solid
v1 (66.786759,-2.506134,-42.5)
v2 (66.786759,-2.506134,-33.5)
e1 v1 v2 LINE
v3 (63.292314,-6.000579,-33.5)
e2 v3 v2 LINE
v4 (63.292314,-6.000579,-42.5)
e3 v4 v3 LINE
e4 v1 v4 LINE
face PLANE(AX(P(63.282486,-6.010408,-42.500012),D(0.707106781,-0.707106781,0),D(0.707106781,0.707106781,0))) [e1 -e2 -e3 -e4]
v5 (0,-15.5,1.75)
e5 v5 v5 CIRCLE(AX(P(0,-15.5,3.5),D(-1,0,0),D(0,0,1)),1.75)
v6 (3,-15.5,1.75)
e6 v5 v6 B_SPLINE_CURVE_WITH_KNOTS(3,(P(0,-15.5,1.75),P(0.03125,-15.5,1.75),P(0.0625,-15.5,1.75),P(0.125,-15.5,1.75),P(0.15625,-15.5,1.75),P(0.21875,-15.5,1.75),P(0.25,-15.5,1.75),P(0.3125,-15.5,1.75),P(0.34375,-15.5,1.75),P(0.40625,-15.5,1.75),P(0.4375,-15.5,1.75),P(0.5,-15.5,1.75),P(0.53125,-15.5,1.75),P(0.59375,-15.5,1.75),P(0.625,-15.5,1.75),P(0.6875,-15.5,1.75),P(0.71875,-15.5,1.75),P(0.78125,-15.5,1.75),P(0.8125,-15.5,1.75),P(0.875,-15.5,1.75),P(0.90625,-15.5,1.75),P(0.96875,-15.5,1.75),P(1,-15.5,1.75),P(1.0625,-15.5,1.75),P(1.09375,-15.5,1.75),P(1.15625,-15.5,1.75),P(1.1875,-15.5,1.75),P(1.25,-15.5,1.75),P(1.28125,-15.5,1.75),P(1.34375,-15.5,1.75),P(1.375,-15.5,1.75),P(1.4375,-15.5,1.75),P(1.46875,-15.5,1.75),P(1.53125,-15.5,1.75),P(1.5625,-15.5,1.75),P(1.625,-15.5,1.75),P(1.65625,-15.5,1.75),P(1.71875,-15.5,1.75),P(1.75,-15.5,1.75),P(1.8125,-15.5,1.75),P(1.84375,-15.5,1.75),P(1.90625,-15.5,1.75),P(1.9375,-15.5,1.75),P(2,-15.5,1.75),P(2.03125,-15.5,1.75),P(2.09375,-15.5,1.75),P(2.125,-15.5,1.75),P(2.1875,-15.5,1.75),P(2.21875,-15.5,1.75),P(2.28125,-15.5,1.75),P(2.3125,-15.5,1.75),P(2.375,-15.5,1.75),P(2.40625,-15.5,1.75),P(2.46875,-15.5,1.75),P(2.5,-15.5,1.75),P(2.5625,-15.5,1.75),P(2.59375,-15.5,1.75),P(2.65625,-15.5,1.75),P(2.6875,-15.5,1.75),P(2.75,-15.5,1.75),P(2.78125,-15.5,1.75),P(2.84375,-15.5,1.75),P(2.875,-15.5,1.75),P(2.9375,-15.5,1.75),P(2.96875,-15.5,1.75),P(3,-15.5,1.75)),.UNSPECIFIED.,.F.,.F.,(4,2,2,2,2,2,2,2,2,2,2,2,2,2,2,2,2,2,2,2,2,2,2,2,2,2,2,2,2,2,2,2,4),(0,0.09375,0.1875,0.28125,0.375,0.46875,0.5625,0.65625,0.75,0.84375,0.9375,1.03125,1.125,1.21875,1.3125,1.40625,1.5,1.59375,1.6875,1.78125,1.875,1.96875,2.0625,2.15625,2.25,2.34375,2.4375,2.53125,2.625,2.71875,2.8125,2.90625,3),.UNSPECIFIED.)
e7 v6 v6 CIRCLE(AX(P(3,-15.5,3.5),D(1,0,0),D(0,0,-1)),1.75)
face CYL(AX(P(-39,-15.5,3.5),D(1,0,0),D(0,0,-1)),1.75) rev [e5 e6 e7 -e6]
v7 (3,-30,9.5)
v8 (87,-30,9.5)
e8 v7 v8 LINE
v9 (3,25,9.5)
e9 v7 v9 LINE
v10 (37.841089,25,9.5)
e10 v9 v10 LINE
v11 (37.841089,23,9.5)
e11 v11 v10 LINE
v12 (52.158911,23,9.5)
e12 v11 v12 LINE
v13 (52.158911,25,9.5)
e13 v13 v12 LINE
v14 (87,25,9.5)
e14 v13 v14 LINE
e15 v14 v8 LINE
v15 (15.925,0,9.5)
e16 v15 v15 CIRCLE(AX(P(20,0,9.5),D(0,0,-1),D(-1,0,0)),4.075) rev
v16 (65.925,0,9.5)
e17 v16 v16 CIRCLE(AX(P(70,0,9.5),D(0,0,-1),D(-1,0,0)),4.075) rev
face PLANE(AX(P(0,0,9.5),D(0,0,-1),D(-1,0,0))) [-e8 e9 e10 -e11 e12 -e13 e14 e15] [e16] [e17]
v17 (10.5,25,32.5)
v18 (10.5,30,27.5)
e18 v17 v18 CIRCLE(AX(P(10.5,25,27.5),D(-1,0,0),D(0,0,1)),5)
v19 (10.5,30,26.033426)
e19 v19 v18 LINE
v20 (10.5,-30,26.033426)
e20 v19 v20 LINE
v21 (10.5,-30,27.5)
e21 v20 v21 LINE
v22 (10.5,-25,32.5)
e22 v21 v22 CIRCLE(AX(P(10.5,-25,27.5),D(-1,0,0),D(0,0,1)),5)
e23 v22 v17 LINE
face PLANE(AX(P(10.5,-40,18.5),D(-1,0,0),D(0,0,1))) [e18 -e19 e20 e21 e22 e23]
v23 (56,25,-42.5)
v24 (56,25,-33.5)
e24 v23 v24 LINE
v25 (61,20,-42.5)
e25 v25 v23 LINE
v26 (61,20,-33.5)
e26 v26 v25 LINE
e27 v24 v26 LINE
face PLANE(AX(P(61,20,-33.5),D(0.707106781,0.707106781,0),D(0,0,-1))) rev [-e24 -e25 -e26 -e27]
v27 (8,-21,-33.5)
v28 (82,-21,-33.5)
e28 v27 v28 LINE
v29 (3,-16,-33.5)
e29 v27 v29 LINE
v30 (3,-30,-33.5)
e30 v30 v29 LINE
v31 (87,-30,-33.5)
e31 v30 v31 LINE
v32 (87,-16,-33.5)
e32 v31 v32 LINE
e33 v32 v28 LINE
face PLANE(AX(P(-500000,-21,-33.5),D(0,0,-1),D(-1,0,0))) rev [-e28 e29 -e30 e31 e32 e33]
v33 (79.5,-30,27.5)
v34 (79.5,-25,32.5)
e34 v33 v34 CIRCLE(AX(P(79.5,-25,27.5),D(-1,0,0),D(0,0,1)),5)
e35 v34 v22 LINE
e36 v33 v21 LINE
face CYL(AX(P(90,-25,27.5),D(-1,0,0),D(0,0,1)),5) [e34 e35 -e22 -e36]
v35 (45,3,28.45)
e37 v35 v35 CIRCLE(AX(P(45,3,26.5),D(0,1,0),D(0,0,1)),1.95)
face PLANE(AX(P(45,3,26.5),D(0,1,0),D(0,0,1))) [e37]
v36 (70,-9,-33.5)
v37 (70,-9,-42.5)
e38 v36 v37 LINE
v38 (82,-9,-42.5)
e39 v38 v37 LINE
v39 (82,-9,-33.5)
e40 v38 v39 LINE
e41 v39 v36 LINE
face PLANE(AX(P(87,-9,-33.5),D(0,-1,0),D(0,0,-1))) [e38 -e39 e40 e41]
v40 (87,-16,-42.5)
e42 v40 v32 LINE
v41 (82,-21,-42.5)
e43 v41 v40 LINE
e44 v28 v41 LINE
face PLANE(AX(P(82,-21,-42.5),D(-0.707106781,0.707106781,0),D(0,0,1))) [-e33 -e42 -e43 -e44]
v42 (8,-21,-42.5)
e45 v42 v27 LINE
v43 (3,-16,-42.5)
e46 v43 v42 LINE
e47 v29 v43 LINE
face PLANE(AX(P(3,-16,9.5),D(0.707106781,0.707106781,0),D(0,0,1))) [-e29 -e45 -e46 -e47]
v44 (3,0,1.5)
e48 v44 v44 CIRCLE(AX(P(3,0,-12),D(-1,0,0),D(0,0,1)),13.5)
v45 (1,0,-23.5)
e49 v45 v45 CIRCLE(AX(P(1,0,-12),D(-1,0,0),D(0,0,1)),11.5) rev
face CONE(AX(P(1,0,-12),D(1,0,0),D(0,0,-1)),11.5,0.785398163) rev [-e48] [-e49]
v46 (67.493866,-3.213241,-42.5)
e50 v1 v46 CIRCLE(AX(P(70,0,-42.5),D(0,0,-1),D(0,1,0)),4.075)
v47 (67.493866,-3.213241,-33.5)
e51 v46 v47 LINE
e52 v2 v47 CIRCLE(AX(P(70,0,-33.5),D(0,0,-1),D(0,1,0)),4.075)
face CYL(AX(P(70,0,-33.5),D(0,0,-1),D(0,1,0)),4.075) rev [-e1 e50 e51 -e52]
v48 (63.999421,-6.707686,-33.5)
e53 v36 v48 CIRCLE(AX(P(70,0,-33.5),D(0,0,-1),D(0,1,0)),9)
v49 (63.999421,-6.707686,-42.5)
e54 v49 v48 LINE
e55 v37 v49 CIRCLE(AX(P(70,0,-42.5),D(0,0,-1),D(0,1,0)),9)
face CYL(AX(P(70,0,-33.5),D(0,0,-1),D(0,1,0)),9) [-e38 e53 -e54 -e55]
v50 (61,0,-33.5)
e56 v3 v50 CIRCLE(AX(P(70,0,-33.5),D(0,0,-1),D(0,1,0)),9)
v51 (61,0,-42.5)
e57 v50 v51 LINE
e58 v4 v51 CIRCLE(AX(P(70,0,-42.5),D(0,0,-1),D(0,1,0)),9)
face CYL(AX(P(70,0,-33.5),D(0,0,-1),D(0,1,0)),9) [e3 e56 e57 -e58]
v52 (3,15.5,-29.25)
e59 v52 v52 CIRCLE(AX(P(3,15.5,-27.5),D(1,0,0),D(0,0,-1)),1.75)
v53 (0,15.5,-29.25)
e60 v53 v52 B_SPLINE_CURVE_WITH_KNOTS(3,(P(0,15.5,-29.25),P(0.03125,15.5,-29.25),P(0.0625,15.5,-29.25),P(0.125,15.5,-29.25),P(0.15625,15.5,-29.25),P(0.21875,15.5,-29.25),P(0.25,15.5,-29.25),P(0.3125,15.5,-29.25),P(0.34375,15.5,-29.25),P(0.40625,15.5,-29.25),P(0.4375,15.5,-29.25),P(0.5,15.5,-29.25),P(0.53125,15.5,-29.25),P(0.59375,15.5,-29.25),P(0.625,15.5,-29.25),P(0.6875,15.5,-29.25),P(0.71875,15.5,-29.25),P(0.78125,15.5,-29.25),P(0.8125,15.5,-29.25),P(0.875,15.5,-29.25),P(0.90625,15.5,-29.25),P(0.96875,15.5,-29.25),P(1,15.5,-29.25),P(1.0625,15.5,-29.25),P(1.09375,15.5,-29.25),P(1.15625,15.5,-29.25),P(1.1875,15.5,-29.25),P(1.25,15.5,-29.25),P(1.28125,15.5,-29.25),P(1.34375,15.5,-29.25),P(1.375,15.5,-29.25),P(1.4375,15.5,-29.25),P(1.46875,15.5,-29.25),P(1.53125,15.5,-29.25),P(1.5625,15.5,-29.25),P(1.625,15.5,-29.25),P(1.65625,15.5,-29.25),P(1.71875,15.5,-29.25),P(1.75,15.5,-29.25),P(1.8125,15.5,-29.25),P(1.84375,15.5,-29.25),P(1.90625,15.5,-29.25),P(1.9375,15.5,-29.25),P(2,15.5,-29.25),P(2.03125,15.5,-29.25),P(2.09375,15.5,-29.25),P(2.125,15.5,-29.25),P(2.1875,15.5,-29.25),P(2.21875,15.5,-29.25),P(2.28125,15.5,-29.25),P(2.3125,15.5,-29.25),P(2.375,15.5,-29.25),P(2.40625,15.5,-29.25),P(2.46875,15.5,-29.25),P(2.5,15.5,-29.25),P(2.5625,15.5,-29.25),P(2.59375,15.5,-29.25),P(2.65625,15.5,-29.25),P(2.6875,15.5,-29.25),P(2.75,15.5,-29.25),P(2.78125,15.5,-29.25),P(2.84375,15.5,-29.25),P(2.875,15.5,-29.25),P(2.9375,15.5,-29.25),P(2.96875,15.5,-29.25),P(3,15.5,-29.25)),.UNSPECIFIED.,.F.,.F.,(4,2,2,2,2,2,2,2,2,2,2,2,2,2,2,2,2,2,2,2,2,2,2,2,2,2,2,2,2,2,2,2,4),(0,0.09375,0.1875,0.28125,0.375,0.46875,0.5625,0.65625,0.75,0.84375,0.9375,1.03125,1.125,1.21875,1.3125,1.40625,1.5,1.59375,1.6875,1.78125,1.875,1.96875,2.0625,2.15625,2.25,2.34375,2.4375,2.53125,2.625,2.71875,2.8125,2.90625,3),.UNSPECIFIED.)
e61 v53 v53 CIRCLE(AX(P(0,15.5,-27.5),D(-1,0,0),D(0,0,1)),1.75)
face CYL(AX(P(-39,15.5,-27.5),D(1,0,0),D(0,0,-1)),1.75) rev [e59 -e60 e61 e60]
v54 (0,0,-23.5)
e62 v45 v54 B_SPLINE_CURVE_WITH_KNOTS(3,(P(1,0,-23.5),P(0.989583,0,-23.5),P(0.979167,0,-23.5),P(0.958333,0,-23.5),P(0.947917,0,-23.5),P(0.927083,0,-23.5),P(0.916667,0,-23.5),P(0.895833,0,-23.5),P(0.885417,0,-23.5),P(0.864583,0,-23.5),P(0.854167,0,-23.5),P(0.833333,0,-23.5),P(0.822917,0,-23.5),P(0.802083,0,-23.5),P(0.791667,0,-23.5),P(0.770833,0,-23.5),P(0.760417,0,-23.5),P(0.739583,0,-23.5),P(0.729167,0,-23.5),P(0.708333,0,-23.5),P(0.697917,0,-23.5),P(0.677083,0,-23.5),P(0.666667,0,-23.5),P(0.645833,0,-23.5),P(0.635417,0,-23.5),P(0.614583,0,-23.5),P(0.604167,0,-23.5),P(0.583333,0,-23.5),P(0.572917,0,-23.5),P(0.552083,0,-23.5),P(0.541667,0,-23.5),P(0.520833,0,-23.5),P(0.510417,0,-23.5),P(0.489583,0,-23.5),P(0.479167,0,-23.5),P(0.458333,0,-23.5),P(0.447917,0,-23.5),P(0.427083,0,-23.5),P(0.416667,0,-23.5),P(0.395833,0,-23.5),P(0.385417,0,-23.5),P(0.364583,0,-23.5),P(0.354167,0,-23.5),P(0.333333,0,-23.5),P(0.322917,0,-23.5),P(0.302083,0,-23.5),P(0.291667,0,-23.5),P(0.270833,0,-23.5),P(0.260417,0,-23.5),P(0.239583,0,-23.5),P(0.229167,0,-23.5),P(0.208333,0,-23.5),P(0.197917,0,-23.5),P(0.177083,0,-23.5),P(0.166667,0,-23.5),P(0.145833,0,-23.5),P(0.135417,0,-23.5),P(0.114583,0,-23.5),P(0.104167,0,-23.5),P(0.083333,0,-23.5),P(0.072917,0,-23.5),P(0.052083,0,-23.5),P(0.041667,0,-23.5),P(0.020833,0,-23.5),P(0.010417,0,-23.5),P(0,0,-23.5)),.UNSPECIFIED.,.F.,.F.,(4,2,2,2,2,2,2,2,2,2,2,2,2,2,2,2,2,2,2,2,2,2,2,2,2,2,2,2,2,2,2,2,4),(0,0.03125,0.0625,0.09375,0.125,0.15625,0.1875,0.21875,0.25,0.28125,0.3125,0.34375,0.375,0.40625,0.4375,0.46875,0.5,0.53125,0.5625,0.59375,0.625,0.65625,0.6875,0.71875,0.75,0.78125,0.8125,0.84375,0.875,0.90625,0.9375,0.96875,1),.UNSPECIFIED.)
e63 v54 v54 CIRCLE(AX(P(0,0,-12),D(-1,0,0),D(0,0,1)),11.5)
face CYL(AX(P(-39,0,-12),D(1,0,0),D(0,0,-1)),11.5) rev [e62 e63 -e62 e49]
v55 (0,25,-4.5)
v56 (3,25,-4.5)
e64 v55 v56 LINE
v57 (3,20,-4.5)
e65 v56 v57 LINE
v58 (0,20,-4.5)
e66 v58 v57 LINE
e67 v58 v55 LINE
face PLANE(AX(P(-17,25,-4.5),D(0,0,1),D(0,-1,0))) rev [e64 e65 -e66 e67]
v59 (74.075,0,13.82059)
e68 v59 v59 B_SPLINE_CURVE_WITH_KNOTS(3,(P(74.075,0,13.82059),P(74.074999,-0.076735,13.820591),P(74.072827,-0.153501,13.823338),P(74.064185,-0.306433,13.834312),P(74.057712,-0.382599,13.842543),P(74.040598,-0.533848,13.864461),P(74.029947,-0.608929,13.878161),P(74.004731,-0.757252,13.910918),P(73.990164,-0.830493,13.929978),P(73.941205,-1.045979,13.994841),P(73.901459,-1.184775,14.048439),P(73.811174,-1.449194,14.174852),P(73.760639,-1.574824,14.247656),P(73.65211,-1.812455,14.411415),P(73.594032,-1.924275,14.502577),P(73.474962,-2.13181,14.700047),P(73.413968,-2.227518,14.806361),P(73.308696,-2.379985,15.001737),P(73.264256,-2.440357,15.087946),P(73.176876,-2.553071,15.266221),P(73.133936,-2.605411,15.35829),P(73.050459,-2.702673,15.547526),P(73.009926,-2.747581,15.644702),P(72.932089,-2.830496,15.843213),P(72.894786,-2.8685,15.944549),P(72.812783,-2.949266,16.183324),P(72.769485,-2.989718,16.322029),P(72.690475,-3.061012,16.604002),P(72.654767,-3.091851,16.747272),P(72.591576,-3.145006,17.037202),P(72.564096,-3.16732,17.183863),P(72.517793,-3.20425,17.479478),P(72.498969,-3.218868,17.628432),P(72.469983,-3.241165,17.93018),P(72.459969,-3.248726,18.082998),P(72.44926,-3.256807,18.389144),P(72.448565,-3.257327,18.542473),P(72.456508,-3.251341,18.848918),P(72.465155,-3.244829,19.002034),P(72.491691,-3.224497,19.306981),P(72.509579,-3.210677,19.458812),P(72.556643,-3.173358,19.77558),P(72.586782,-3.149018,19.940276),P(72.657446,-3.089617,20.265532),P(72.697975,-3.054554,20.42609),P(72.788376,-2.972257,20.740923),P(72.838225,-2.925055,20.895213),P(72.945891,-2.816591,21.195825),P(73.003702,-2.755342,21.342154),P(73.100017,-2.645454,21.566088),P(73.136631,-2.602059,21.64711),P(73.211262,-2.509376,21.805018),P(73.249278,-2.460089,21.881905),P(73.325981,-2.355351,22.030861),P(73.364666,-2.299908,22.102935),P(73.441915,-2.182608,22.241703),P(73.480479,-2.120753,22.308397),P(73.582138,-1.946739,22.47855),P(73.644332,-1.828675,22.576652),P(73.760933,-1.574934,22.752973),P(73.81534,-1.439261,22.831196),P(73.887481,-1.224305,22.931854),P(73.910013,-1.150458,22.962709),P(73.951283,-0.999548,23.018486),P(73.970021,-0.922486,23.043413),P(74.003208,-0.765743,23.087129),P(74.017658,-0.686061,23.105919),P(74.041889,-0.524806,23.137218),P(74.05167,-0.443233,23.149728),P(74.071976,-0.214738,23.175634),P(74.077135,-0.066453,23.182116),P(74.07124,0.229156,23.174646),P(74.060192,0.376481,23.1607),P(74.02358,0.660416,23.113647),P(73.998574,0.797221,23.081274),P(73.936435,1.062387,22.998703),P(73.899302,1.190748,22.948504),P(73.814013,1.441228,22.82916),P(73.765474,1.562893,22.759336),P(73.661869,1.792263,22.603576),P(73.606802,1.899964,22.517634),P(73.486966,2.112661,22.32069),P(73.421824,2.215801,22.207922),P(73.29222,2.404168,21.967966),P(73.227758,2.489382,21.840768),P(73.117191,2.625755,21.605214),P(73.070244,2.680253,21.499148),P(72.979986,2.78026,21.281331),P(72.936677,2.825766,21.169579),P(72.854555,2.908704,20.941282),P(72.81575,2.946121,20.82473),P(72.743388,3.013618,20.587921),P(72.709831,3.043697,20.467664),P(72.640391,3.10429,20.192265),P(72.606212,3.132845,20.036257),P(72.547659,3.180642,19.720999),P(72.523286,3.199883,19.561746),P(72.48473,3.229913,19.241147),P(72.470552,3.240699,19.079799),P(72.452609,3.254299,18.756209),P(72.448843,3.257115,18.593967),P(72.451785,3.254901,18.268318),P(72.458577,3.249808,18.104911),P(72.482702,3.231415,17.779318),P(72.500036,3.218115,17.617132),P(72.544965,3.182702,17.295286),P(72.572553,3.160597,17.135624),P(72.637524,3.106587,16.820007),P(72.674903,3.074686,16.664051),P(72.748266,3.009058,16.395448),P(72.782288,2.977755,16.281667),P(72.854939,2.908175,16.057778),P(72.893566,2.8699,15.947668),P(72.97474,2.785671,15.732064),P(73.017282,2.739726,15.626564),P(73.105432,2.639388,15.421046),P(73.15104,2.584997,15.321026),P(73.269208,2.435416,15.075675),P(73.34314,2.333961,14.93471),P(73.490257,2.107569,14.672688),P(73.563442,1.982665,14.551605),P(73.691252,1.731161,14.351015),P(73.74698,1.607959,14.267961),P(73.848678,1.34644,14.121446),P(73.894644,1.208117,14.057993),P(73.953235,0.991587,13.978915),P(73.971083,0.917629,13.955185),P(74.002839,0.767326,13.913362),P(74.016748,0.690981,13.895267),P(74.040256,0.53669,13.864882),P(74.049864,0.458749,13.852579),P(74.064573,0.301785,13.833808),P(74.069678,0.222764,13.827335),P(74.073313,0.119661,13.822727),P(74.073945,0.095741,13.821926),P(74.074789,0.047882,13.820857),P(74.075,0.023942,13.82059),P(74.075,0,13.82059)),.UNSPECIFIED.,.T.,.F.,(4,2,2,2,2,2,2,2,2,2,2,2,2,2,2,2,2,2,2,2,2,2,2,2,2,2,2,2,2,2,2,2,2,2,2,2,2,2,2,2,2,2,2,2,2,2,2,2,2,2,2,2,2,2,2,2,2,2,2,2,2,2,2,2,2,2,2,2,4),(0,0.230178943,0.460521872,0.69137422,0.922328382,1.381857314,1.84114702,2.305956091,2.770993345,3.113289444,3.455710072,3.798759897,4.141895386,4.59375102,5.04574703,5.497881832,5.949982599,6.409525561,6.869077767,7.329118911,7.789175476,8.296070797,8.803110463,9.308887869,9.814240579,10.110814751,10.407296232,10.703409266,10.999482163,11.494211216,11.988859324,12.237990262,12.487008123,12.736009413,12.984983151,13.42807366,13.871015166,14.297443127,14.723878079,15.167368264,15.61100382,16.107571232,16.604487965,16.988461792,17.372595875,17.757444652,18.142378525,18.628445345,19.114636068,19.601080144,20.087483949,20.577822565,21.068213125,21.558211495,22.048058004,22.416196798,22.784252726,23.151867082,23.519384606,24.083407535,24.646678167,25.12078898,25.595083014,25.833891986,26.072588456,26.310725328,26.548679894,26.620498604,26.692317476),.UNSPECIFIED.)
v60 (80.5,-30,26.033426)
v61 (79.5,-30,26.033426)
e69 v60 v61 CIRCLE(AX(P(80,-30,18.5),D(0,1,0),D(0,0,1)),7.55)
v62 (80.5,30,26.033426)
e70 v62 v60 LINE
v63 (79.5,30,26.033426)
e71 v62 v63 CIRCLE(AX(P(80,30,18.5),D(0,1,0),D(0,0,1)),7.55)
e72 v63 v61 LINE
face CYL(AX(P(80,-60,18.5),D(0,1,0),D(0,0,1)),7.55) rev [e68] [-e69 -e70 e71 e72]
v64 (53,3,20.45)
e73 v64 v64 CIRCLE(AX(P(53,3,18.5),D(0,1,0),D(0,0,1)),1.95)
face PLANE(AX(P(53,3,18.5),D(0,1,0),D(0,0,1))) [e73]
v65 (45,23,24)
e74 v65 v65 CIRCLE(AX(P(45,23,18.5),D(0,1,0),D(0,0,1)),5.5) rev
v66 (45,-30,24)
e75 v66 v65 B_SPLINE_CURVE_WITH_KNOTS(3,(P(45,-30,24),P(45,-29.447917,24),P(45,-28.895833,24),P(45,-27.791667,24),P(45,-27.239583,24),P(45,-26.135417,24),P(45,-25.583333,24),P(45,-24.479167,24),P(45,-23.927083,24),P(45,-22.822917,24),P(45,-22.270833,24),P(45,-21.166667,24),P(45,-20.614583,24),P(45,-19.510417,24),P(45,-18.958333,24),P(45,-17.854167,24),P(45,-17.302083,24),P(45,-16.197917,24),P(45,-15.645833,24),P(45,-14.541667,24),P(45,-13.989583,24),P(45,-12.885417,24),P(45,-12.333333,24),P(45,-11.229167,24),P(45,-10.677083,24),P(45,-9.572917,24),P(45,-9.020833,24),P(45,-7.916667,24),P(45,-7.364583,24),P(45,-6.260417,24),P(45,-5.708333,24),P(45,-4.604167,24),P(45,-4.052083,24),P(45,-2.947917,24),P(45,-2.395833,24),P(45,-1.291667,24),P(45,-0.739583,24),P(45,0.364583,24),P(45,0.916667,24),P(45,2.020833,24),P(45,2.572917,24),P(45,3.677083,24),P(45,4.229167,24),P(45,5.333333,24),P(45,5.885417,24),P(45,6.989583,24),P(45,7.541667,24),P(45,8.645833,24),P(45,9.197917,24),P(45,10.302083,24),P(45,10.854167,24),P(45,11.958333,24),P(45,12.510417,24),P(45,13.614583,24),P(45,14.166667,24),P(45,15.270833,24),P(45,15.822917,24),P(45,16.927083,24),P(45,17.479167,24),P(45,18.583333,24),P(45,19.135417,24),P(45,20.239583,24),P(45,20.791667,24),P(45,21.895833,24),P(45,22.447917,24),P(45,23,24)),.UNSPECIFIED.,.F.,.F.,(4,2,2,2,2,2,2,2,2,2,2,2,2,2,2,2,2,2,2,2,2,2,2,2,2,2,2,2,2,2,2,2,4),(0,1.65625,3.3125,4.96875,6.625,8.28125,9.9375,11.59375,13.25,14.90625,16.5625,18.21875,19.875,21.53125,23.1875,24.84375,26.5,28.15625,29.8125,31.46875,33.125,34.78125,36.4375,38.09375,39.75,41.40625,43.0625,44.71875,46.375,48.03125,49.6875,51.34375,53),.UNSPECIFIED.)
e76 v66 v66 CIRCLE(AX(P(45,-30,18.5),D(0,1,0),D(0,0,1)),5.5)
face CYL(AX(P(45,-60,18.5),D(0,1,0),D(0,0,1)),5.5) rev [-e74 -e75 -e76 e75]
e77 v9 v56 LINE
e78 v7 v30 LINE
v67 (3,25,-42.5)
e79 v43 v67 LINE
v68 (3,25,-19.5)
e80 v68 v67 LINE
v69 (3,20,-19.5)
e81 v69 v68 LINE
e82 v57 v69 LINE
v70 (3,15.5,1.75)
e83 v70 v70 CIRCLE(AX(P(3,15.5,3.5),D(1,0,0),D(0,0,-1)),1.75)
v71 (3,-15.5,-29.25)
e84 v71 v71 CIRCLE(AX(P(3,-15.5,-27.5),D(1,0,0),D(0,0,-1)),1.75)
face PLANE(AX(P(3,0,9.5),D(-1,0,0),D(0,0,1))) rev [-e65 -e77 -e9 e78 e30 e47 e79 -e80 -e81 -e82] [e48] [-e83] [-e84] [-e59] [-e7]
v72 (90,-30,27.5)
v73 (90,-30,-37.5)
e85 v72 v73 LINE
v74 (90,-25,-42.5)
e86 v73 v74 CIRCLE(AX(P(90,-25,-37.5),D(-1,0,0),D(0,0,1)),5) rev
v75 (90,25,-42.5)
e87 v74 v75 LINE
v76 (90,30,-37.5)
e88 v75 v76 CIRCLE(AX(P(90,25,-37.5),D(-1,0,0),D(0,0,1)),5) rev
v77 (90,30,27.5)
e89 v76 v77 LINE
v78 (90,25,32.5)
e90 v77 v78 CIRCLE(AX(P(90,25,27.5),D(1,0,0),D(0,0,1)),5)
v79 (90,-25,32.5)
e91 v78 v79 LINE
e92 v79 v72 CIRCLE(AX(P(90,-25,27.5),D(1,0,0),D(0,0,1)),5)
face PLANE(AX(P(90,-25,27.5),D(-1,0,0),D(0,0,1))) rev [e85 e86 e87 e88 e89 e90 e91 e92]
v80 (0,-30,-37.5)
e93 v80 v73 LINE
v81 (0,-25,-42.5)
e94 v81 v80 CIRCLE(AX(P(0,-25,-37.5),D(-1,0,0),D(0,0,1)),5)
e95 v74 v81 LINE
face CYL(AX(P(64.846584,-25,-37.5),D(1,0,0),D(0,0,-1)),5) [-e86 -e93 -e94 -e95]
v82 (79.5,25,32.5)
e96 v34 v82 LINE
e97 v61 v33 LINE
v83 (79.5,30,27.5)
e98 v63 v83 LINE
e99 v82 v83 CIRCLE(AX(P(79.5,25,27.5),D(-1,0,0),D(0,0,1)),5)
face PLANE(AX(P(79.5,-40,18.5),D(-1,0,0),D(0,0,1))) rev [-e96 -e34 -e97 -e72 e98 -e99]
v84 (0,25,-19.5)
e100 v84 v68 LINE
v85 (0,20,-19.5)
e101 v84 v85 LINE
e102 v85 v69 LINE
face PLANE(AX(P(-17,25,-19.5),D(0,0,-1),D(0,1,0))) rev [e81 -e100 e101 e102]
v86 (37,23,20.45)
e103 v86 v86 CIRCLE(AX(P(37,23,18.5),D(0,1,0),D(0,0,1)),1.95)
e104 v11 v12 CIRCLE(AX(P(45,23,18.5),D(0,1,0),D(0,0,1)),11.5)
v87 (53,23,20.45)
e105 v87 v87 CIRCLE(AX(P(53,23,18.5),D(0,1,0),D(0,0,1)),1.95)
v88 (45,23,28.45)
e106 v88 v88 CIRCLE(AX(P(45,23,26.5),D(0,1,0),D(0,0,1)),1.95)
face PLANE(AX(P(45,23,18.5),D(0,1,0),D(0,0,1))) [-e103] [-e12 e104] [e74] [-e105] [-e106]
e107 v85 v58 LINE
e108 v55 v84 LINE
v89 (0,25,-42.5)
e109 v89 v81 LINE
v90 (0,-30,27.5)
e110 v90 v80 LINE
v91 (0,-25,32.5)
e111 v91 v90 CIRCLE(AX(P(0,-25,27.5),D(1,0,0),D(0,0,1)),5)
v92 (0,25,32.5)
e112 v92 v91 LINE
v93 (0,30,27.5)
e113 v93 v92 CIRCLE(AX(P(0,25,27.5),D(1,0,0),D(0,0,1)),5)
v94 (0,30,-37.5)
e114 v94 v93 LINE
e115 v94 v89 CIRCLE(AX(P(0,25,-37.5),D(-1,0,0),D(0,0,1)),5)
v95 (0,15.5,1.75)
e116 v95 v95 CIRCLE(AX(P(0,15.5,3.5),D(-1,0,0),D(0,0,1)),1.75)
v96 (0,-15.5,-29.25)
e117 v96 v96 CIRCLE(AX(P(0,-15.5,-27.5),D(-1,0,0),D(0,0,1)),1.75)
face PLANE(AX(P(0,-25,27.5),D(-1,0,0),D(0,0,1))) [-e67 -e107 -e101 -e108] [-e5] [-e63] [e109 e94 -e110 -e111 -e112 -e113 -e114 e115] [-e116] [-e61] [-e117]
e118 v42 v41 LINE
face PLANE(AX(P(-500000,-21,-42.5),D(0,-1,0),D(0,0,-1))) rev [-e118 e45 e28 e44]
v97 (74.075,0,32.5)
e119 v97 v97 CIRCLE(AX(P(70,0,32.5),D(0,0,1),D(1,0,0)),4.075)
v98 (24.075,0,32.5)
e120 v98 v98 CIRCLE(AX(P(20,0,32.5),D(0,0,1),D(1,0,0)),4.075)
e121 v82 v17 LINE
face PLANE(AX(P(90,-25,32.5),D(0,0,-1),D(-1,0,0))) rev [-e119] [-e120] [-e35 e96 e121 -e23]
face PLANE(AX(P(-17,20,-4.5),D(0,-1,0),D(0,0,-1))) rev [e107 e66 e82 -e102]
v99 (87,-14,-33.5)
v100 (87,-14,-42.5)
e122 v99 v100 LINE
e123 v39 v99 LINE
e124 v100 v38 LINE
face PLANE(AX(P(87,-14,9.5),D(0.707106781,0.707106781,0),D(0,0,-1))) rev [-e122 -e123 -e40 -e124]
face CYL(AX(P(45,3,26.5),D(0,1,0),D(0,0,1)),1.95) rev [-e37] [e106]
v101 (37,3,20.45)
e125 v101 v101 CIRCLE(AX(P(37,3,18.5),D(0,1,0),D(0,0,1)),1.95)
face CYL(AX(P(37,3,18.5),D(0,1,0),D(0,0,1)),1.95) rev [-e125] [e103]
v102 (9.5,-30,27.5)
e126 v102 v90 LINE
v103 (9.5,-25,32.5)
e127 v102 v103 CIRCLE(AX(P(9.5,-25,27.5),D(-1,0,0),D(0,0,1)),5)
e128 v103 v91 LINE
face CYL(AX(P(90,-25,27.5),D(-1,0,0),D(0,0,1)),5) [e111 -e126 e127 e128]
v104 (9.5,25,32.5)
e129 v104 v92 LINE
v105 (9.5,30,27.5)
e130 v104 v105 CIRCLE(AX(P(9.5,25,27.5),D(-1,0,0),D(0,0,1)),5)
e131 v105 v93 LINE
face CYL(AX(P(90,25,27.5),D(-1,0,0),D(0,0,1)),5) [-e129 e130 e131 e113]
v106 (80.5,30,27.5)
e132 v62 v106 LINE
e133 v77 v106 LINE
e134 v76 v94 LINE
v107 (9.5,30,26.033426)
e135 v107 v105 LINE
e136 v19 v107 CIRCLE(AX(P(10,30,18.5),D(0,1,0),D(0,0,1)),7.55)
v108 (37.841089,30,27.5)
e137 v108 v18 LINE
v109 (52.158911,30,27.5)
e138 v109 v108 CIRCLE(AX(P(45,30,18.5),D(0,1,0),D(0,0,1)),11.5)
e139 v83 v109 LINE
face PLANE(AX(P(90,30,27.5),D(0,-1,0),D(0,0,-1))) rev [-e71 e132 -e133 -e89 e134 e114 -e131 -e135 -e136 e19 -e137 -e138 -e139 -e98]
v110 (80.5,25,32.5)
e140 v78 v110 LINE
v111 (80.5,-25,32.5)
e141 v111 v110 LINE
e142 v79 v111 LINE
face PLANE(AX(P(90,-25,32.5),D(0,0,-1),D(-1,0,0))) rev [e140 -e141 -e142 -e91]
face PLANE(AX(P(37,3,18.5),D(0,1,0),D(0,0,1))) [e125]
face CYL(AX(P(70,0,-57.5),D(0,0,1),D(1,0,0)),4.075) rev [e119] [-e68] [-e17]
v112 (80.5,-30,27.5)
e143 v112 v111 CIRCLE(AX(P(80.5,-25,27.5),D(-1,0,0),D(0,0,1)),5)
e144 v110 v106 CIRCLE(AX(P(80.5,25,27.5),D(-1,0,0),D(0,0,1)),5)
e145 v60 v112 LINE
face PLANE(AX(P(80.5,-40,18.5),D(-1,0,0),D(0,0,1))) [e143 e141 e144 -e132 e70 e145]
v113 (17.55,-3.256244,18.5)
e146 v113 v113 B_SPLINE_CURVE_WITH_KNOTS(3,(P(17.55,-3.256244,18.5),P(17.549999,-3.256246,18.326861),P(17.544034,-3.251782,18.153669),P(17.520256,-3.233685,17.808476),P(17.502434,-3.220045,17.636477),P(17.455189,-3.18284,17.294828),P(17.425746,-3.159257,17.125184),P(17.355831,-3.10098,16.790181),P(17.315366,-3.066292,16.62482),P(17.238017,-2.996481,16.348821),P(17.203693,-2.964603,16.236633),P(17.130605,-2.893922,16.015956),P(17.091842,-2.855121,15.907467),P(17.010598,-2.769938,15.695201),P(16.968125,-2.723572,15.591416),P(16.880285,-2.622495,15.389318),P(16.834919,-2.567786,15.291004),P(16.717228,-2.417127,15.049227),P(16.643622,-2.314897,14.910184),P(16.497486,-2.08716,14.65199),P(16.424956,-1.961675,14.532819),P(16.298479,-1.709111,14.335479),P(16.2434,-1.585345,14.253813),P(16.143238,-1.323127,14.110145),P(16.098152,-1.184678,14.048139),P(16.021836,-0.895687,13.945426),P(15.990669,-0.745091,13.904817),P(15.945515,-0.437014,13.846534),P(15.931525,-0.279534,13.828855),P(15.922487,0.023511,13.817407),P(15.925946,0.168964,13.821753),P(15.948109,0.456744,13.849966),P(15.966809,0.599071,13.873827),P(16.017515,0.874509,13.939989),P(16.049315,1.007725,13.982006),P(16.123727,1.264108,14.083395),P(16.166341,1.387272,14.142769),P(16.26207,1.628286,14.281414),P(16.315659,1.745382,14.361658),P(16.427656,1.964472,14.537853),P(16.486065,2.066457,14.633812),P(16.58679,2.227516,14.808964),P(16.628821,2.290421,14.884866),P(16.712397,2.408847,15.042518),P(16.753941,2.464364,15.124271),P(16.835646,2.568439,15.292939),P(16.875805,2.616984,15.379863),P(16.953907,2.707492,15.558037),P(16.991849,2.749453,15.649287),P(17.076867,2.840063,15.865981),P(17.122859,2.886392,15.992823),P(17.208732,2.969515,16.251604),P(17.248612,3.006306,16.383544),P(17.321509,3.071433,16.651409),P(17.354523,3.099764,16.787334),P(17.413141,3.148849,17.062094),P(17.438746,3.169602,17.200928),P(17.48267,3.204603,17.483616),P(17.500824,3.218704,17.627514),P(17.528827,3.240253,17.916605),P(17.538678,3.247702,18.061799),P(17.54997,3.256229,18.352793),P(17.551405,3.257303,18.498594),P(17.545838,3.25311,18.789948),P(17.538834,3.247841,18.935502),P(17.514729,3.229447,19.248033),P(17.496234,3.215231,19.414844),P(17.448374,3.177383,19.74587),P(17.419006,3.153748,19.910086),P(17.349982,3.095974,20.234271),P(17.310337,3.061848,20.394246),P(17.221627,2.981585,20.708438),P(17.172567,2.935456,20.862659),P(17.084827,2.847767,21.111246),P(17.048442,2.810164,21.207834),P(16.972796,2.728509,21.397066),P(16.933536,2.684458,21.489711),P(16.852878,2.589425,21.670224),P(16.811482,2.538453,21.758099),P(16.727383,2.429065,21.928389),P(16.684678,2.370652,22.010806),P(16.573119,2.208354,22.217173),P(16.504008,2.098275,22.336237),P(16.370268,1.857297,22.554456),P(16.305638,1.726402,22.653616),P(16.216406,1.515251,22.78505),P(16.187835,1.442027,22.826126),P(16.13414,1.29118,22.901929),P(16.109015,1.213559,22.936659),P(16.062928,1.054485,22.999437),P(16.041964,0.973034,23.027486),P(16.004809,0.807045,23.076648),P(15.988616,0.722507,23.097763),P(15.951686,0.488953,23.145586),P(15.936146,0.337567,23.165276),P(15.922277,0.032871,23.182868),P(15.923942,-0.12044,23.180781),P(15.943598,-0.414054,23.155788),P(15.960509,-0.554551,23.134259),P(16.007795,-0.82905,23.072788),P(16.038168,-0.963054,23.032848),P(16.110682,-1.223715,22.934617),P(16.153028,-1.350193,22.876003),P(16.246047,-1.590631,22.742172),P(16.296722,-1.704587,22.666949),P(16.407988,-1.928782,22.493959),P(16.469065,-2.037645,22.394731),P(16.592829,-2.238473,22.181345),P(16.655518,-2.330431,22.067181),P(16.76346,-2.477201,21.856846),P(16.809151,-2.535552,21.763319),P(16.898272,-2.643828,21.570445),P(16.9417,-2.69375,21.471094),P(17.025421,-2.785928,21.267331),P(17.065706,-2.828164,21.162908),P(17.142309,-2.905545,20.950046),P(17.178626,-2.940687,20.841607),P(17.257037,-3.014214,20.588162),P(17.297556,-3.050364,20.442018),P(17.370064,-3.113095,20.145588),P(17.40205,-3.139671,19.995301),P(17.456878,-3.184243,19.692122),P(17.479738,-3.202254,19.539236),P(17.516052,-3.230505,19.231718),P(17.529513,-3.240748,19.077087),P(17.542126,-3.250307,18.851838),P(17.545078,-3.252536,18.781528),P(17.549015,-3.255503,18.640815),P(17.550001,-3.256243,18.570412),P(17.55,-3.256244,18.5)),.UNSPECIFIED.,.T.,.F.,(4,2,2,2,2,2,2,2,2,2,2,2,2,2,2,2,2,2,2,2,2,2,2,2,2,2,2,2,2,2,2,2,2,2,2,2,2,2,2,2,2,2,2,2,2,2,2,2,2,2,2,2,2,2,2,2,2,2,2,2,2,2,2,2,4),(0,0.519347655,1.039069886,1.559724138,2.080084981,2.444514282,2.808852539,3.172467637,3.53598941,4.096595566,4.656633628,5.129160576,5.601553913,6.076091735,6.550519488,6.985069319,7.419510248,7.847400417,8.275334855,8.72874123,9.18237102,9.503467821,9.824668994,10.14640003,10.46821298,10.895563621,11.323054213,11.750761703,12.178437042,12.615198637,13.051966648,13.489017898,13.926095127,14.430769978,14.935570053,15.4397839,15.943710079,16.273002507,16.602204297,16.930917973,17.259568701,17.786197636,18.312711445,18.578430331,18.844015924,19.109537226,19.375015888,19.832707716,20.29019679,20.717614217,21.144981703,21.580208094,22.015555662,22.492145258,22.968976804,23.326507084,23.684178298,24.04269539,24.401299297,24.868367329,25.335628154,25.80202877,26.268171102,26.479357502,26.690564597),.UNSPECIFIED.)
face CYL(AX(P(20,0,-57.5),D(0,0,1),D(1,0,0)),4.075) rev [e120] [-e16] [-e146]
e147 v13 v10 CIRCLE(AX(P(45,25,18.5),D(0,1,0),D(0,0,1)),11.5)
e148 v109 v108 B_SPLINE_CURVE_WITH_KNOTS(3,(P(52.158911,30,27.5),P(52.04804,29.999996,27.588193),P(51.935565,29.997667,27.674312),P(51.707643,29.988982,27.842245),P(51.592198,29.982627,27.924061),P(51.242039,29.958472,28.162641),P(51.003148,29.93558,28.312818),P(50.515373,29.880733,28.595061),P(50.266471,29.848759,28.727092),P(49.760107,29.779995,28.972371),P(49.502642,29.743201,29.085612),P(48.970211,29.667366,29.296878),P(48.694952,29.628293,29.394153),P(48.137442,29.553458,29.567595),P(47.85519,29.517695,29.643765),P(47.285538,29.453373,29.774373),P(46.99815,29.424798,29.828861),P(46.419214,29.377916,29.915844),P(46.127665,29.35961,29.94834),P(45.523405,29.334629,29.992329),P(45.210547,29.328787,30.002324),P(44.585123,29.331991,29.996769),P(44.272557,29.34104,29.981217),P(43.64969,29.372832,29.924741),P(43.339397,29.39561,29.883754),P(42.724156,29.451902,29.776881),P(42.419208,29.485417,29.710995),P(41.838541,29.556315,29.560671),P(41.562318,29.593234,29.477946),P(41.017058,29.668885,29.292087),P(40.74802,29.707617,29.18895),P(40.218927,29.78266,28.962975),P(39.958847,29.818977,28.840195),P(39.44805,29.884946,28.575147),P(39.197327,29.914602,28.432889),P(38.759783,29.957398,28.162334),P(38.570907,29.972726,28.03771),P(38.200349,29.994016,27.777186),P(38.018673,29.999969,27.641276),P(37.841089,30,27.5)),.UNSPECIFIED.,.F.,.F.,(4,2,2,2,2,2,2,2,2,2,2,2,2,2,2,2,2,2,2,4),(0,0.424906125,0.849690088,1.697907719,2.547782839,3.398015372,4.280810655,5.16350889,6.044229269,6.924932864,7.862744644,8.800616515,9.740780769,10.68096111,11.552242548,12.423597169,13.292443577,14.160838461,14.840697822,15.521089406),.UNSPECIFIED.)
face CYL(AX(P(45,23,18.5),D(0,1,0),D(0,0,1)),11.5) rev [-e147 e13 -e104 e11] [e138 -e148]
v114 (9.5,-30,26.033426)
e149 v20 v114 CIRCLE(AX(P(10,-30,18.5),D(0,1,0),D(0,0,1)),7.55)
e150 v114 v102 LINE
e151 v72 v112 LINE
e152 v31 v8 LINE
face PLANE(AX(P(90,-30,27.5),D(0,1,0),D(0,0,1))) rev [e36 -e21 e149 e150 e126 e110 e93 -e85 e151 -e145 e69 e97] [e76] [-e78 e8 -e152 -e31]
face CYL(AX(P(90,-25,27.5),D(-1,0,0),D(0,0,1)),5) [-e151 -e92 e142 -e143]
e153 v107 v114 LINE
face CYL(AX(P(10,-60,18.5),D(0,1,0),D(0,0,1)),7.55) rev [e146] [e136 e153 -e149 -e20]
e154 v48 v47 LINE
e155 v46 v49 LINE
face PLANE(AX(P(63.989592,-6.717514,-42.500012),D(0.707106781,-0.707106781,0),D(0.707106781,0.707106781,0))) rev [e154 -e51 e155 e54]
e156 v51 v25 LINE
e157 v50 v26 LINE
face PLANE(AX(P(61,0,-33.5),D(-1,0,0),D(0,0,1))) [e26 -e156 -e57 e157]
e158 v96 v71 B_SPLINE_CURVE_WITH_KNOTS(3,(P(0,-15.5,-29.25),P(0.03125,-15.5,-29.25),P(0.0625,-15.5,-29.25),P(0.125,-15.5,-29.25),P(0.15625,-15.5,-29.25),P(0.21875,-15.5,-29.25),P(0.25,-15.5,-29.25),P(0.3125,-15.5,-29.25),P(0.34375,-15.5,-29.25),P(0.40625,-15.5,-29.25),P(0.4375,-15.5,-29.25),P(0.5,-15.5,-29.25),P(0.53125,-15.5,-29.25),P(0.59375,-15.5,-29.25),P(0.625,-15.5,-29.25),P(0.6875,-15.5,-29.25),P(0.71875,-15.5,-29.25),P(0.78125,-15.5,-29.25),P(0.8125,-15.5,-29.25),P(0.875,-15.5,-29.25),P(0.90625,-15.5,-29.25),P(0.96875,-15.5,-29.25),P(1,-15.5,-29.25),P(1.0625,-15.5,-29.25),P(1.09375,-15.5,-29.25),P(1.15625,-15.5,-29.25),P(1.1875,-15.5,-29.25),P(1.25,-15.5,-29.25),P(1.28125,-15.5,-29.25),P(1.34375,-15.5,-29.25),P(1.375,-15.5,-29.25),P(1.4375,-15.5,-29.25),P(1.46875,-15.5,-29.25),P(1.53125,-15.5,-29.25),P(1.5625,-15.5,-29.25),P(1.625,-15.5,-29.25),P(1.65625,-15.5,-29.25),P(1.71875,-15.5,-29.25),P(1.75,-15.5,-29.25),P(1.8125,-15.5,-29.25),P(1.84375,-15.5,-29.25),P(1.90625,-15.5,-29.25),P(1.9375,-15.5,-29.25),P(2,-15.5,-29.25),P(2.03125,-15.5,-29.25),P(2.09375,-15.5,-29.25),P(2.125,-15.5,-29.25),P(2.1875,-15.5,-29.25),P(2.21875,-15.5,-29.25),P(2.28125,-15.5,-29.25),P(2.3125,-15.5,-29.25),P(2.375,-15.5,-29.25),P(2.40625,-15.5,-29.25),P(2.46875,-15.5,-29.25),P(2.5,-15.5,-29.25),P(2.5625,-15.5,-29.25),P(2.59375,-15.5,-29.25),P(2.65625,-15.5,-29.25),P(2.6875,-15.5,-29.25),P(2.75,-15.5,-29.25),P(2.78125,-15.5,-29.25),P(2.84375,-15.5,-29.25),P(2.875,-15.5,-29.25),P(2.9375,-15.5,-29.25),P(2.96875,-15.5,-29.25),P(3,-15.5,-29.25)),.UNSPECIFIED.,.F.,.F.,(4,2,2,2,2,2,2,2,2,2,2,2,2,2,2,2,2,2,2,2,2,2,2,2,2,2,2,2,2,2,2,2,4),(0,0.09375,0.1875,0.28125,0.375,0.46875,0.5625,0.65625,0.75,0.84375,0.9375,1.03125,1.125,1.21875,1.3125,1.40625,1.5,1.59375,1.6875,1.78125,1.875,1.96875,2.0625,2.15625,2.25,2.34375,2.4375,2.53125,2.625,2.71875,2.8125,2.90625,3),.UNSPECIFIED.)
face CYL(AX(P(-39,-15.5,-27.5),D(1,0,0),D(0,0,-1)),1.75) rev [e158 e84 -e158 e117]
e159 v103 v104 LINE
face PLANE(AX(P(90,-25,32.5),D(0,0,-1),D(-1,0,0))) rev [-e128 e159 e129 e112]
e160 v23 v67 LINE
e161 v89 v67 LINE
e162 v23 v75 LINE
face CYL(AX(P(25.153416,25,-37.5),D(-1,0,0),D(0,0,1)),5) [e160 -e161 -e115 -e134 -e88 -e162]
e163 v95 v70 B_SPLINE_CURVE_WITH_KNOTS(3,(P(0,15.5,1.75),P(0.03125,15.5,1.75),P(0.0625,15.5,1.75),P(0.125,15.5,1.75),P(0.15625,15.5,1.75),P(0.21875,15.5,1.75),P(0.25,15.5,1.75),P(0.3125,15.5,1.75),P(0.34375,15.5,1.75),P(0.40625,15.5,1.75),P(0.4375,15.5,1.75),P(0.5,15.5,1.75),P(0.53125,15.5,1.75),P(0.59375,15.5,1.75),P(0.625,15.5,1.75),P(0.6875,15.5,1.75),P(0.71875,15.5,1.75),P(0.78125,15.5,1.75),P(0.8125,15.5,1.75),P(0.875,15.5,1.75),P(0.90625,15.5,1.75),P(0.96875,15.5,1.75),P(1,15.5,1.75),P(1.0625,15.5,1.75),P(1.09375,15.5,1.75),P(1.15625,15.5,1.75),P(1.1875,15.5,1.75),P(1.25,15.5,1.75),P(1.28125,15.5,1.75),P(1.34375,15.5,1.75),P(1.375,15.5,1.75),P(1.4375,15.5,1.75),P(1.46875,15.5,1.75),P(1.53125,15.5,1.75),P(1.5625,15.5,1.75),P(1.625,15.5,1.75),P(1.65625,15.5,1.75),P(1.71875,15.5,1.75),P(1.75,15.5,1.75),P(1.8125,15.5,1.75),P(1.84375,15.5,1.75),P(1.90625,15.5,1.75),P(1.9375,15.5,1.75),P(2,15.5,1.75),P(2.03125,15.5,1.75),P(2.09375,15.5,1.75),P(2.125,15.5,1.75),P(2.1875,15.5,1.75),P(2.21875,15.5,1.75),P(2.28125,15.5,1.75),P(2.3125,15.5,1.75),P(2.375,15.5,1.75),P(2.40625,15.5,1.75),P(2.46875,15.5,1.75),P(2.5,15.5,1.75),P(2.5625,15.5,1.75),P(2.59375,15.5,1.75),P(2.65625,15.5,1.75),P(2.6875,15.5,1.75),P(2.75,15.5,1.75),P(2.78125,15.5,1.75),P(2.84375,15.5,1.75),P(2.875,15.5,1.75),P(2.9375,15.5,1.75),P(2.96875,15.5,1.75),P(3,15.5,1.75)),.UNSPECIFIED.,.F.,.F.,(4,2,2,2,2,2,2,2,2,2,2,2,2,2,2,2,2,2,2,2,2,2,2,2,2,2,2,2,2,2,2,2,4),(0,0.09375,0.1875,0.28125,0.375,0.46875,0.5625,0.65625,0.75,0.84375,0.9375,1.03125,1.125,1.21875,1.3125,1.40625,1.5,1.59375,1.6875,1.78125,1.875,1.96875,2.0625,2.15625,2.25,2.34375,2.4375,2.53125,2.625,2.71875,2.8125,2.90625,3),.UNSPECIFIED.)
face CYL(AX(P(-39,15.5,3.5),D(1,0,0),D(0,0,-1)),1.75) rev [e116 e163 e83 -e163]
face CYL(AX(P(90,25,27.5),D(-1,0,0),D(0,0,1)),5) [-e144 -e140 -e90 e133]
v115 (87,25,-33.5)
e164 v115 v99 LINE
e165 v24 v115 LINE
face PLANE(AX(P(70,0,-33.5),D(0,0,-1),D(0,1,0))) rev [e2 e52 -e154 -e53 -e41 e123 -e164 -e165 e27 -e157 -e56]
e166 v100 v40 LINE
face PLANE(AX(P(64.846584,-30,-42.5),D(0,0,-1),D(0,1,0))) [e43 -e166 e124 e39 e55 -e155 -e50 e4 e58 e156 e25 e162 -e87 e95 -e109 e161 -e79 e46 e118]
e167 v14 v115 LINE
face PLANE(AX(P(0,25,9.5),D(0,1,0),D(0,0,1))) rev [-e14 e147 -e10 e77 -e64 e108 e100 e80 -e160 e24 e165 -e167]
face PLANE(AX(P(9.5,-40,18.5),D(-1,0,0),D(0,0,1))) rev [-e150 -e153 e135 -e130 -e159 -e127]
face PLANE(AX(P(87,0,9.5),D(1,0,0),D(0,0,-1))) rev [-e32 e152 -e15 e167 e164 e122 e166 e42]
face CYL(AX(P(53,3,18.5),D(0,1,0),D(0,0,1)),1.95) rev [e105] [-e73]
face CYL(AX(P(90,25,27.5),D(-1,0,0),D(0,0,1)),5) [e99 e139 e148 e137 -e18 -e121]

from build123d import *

# Parameters (mm, degrees)
BOSS_EXTRUDE1_DEPTH          = 90
SKETCH2_R                    = 7.55
SKETCH2_R_2                  = 5.5
CUT_EXTRUDE1_DEPTH           = 90
SKETCH3_R                    = 4.075
CUT_EXTRUDE2_DEPTH           = 90
CUT_EXTRUDE3_START           = -42
SKETCH4_W                    = 84
SKETCH4_H                    = 50
SKETCH4_R                    = 4.075
CUT_EXTRUDE3_DEPTH           = 42
SKETCH5_R                    = 11.5
SKETCH5_R_2                  = 1.75
CUT_EXTRUDE4_DEPTH           = 42
SKETCH10_W                   = 1
SKETCH10_H                   = 23.85052841
CUT_EXTRUDE_THIN1_DEPTH      = 70
CHAMFER2_SIZE                = 2
BOSS_EXTRUDE4_DEPTH          = 3
SKETCH15_W                   = 15
SKETCH15_H                   = 60
BOSS_EXTRUDE5_DEPTH          = 3
FILLET1_R                    = 5
SKETCH16_W                   = 84
SKETCH16_H                   = 42
CUT_EXTRUDE5_DEPTH           = 10
BOSS_EXTRUDE6_DEPTH          = 84
BOSS_EXTRUDE7_START          = -9
SKETCH18_R                   = 4.075
BOSS_EXTRUDE7_DEPTH          = 9
CUT_EXTRUDE_THIN3_DEPTH      = 121.933866311
CUT_EXTRUDE_THIN3_DEPTH_BACK = 9
SKETCH21_R                   = 11.5
CUT_EXTRUDE7_DEPTH           = 7
SKETCH22_R                   = 1.95
CUT_EXTRUDE8_DEPTH           = 20
SKETCH23_W                   = 15
SKETCH23_H                   = 5
CUT_EXTRUDE9_DEPTH           = 20
BOSS_EXTRUDE8_REACH          = 103.367
CHAMFER3_SIZE                = 5
CHAMFER4_SIZE                = 5


with BuildPart() as part:
    # Sketch1 → Boss-Extrude1 (new body)
    with BuildSketch(Plane(origin=(0, 0, 0), x_dir=(0, 0, -1), z_dir=(1, 0, 0))):
        with BuildLine():
            Line((-27.5, -30), (27.5, -30))
            ThreePointArc((27.5, -30), (31.035533906, -28.535533906), (32.5, -25))
            Line((32.5, -25), (32.5, 25))
            ThreePointArc((32.5, 25), (31.035533906, 28.535533906), (27.5, 30))
            Line((27.5, 30), (-27.5, 30))
            ThreePointArc((-27.5, 30), (-31.035533906, 28.535533906), (-32.5, 25))
            Line((-32.5, 25), (-32.5, -25))
            ThreePointArc((-32.5, -25), (-31.035533906, -28.535533906), (-27.5, -30))
        make_face()
    extrude(amount=BOSS_EXTRUDE1_DEPTH)

    # Sketch2 → Cut-Extrude1 (cut)
    with BuildSketch(Plane(origin=(0, 30, 0), x_dir=(1, 0, 0), z_dir=(0, 1, 0))):
        with Locations(Location((10, -18.5, 0), (0, 0, 270))):
            Circle(SKETCH2_R)
        with Locations(Location((80, -18.5, 0), (0, 0, 270))):
            Circle(SKETCH2_R)
        with Locations(Location((45, -18.5, 0), (0, 0, 270))):
            Circle(SKETCH2_R_2)
    extrude(amount=-CUT_EXTRUDE1_DEPTH, mode=Mode.SUBTRACT)

    # Sketch3 → Cut-Extrude2 (cut)
    with BuildSketch(Plane.XY.offset(32.5)):
        with Locations((20, 0)):
            Circle(SKETCH3_R)
        with Locations((70, 0)):
            Circle(SKETCH3_R)
    extrude(amount=-CUT_EXTRUDE2_DEPTH, mode=Mode.SUBTRACT)

    # Sketch4 → Cut-Extrude3 (cut)
    with BuildSketch(Plane(origin=(0, 0, -32.5), x_dir=(-1, 0, 0), z_dir=(0, 0, -1)).offset(CUT_EXTRUDE3_START)):
        with Locations((-45, 0)):
            Rectangle(SKETCH4_W, SKETCH4_H)
        with Locations(Location((-70, 0, 0), (0, 0, 180))):
            Circle(SKETCH4_R, mode=Mode.SUBTRACT)
        with Locations(Location((-20, 0, 0), (0, 0, 180))):
            Circle(SKETCH4_R, mode=Mode.SUBTRACT)
    extrude(amount=CUT_EXTRUDE3_DEPTH, mode=Mode.SUBTRACT)

    # Sketch5 → Cut-Extrude4 (cut)
    with BuildSketch(Plane(origin=(3, 0, 0), x_dir=(0, 0, -1), z_dir=(1, 0, 0))):
        with Locations((12, 0)):
            Circle(SKETCH5_R)
        with Locations((-3.5, 15.5)):
            Circle(SKETCH5_R_2)
        with Locations((27.5, 15.5)):
            Circle(SKETCH5_R_2)
        with Locations((27.5, -15.5)):
            Circle(SKETCH5_R_2)
        with Locations((-3.5, -15.5)):
            Circle(SKETCH5_R_2)
    extrude(amount=-CUT_EXTRUDE4_DEPTH, mode=Mode.SUBTRACT)

    # Sketch10 → Cut-Extrude-Thin1 (cut)
    with BuildSketch(Plane(origin=(0, 30, 0), x_dir=(1, 0, 0), z_dir=(0, 1, 0))):
        with Locations((10, -30.425264205)):
            Rectangle(SKETCH10_W, SKETCH10_H)
        with Locations((80, -30.425264205)):
            Rectangle(SKETCH10_W, SKETCH10_H)
    extrude(amount=-CUT_EXTRUDE_THIN1_DEPTH, mode=Mode.SUBTRACT)

    # Chamfer2
    chamfer2_edges = [part.edges().sort_by_distance(p)[0] for p in [
        (3, 0, -0.5),
    ]]
    chamfer(chamfer2_edges, length=CHAMFER2_SIZE)

    # Sketch14 → Boss-Extrude4 (add)
    with BuildSketch(Plane.ZY):
        with BuildLine():
            Line((-27.5, -30), (-42.5, -30))
            Line((-42.5, -30), (-42.5, 30))
            Line((-42.5, 30), (-27.5, 30))
            ThreePointArc((-27.5, 30), (-31.035533906, 28.535533906), (-32.5, 25))
            Line((-32.5, 25), (-32.5, -25))
            ThreePointArc((-32.5, -25), (-31.035533906, -28.535533906), (-27.5, -30))
        make_face()
    extrude(amount=-BOSS_EXTRUDE4_DEPTH)

    # Sketch15 → Boss-Extrude5 (add)
    with BuildSketch(Plane(origin=(90, 0, 0), x_dir=(0, 0, -1), z_dir=(1, 0, 0))):
        with Locations((35, 0)):
            Rectangle(SKETCH15_W, SKETCH15_H)
    extrude(amount=-BOSS_EXTRUDE5_DEPTH)

    # Fillet1
    fillet1_edges = [part.edges().sort_by_distance(p)[0] for p in [
        (1.5, -30, -42.5),
        (1.5, 30, -42.5),
        (88.5, 30, -42.5),
        (88.5, -30, -42.5),
    ]]
    fillet(fillet1_edges, radius=FILLET1_R)

    # Sketch16 → Cut-Extrude5 (cut)
    with BuildSketch(Plane(origin=(0, -25, 0), x_dir=(1, 0, 0), z_dir=(0, 1, 0))):
        with Locations((45, 11.5)):
            Rectangle(SKETCH16_W, SKETCH16_H)
    extrude(amount=-CUT_EXTRUDE5_DEPTH, mode=Mode.SUBTRACT)

    # Sketch17 → Boss-Extrude6 (add)
    with BuildSketch(Plane(origin=(3, 0, 0), x_dir=(0, 0, -1), z_dir=(1, 0, 0))):
        with BuildLine():
            Line((32.5, 25), (42.5, 25))
            ThreePointArc((42.5, 25), (41.035533906, 28.535533906), (37.5, 30))
            Line((37.5, 30), (27.5, 30))
            ThreePointArc((27.5, 30), (31.035533906, 28.535533906), (32.5, 25))
        make_face()
    extrude(amount=BOSS_EXTRUDE6_DEPTH)

    # Sketch18 → Boss-Extrude7 (add)
    with BuildSketch(Plane(origin=(0, 0, -42.5), x_dir=(-1, 0, 0), z_dir=(0, 0, -1)).offset(BOSS_EXTRUDE7_START)):
        with BuildLine():
            Line((-61, 0), (-61, 25))
            Line((-61, 25), (-87, 25))
            Line((-87, 25), (-87, -9))
            Line((-87, -9), (-70, -9))
            ThreePointArc((-70, -9), (-63.636038969, -6.363961031), (-61, 0))
        make_face()
        with Locations(Location((-70, 0, 0), (0, 0, 180))):
            Circle(SKETCH18_R, mode=Mode.SUBTRACT)
    extrude(amount=BOSS_EXTRUDE7_DEPTH)

    # Sketch19 → Cut-Extrude-Thin3 (cut, two sides: drawn at the far end of the back side and taken through both)
    with BuildSketch(Plane(origin=(0, 0, -42.5), x_dir=(-1, 0, 0), z_dir=(0, 0, -1)).offset(-CUT_EXTRUDE_THIN3_DEPTH_BACK)):
        Polygon((-61.965111244, -7.327781975), (-63.282485579, -6.01040764), (-66.764986476, -2.527906743), (-68.355005201, -0.937888018), (-69.062111982, -1.644994799), (-67.472093257, -3.235013524), (-63.98959236, -6.717514421), (-62.672218025, -8.034888756), align=None)
    extrude(amount=CUT_EXTRUDE_THIN3_DEPTH + CUT_EXTRUDE_THIN3_DEPTH_BACK, mode=Mode.SUBTRACT)

    # Sketch21 → Cut-Extrude7 (cut)
    with BuildSketch(Plane(origin=(0, 30, 0), x_dir=(1, 0, 0), z_dir=(0, 1, 0))):
        with Locations(Location((45, -18.5, 0), (0, 0, 231.500049591))):
            Circle(SKETCH21_R)
    extrude(amount=-CUT_EXTRUDE7_DEPTH, mode=Mode.SUBTRACT)

    # Sketch22 → Cut-Extrude8 (cut)
    with BuildSketch(Plane(origin=(0, 23, 0), x_dir=(1, 0, 0), z_dir=(0, 1, 0))):
        with Locations(Location((53, -18.5, 0), (0, 0, 270))):
            Circle(SKETCH22_R)
        with Locations(Location((45, -26.5, 0), (0, 0, 270))):
            Circle(SKETCH22_R)
        with Locations(Location((37, -18.5, 0), (0, 0, 270))):
            Circle(SKETCH22_R)
    extrude(amount=-CUT_EXTRUDE8_DEPTH, mode=Mode.SUBTRACT)

    # Sketch23 → Cut-Extrude9 (cut)
    with BuildSketch(Plane(origin=(3, 0, 0), x_dir=(0, 0, -1), z_dir=(1, 0, 0))):
        with Locations((12, 22.5)):
            Rectangle(SKETCH23_W, SKETCH23_H)
    extrude(amount=-CUT_EXTRUDE9_DEPTH, mode=Mode.SUBTRACT)

    # Sketch24 → Boss-Extrude8 (add, up to next)
    with BuildSketch(Plane.ZY.offset(-87), mode=Mode.PRIVATE) as boss_extrude8_sk1:
        with BuildLine():
            Line((-42.5, -21), (-33.5, -21))
            Line((-33.5, -21), (-33.5, -30))
            Line((-33.5, -30), (-37.5, -30))
            ThreePointArc((-37.5, -30), (-41.035533906, -28.535533906), (-42.5, -25))
            Line((-42.5, -25), (-42.5, -21))
        make_face()
    boss_extrude8_tool1 = extrude(boss_extrude8_sk1.sketch, amount=BOSS_EXTRUDE8_REACH, mode=Mode.PRIVATE) - part.part
    add(boss_extrude8_tool1.solids().sort_by_distance((87, -25.260021, -37.760021))[0])

    # Chamfer3
    chamfer3_edges = [part.edges().sort_by_distance(p)[0] for p in [
        (87, -9, -38),
        (3, -21, -38),
        (87, -21, -38),
    ]]
    chamfer(chamfer3_edges, length=CHAMFER3_SIZE)

    # Chamfer4
    # the kernel refuses this chamfer: 5 mm, written as the material it adds along each edge
    with BuildSketch(Plane(origin=(61, 25, -33.5), x_dir=(0.027495876610586317, -0.9996219169112968, 0), z_dir=(0, 0, -1))) as chamfer4_piece_1:
        Polygon((CHAMFER4_SIZE * 0.999621916911, CHAMFER4_SIZE * 0.0274958766106), (-CHAMFER4_SIZE * 0.0274958766106, CHAMFER4_SIZE * 0.999621916911), (0, 0), align=None)
    extrude(amount=9)


solid = part.part
